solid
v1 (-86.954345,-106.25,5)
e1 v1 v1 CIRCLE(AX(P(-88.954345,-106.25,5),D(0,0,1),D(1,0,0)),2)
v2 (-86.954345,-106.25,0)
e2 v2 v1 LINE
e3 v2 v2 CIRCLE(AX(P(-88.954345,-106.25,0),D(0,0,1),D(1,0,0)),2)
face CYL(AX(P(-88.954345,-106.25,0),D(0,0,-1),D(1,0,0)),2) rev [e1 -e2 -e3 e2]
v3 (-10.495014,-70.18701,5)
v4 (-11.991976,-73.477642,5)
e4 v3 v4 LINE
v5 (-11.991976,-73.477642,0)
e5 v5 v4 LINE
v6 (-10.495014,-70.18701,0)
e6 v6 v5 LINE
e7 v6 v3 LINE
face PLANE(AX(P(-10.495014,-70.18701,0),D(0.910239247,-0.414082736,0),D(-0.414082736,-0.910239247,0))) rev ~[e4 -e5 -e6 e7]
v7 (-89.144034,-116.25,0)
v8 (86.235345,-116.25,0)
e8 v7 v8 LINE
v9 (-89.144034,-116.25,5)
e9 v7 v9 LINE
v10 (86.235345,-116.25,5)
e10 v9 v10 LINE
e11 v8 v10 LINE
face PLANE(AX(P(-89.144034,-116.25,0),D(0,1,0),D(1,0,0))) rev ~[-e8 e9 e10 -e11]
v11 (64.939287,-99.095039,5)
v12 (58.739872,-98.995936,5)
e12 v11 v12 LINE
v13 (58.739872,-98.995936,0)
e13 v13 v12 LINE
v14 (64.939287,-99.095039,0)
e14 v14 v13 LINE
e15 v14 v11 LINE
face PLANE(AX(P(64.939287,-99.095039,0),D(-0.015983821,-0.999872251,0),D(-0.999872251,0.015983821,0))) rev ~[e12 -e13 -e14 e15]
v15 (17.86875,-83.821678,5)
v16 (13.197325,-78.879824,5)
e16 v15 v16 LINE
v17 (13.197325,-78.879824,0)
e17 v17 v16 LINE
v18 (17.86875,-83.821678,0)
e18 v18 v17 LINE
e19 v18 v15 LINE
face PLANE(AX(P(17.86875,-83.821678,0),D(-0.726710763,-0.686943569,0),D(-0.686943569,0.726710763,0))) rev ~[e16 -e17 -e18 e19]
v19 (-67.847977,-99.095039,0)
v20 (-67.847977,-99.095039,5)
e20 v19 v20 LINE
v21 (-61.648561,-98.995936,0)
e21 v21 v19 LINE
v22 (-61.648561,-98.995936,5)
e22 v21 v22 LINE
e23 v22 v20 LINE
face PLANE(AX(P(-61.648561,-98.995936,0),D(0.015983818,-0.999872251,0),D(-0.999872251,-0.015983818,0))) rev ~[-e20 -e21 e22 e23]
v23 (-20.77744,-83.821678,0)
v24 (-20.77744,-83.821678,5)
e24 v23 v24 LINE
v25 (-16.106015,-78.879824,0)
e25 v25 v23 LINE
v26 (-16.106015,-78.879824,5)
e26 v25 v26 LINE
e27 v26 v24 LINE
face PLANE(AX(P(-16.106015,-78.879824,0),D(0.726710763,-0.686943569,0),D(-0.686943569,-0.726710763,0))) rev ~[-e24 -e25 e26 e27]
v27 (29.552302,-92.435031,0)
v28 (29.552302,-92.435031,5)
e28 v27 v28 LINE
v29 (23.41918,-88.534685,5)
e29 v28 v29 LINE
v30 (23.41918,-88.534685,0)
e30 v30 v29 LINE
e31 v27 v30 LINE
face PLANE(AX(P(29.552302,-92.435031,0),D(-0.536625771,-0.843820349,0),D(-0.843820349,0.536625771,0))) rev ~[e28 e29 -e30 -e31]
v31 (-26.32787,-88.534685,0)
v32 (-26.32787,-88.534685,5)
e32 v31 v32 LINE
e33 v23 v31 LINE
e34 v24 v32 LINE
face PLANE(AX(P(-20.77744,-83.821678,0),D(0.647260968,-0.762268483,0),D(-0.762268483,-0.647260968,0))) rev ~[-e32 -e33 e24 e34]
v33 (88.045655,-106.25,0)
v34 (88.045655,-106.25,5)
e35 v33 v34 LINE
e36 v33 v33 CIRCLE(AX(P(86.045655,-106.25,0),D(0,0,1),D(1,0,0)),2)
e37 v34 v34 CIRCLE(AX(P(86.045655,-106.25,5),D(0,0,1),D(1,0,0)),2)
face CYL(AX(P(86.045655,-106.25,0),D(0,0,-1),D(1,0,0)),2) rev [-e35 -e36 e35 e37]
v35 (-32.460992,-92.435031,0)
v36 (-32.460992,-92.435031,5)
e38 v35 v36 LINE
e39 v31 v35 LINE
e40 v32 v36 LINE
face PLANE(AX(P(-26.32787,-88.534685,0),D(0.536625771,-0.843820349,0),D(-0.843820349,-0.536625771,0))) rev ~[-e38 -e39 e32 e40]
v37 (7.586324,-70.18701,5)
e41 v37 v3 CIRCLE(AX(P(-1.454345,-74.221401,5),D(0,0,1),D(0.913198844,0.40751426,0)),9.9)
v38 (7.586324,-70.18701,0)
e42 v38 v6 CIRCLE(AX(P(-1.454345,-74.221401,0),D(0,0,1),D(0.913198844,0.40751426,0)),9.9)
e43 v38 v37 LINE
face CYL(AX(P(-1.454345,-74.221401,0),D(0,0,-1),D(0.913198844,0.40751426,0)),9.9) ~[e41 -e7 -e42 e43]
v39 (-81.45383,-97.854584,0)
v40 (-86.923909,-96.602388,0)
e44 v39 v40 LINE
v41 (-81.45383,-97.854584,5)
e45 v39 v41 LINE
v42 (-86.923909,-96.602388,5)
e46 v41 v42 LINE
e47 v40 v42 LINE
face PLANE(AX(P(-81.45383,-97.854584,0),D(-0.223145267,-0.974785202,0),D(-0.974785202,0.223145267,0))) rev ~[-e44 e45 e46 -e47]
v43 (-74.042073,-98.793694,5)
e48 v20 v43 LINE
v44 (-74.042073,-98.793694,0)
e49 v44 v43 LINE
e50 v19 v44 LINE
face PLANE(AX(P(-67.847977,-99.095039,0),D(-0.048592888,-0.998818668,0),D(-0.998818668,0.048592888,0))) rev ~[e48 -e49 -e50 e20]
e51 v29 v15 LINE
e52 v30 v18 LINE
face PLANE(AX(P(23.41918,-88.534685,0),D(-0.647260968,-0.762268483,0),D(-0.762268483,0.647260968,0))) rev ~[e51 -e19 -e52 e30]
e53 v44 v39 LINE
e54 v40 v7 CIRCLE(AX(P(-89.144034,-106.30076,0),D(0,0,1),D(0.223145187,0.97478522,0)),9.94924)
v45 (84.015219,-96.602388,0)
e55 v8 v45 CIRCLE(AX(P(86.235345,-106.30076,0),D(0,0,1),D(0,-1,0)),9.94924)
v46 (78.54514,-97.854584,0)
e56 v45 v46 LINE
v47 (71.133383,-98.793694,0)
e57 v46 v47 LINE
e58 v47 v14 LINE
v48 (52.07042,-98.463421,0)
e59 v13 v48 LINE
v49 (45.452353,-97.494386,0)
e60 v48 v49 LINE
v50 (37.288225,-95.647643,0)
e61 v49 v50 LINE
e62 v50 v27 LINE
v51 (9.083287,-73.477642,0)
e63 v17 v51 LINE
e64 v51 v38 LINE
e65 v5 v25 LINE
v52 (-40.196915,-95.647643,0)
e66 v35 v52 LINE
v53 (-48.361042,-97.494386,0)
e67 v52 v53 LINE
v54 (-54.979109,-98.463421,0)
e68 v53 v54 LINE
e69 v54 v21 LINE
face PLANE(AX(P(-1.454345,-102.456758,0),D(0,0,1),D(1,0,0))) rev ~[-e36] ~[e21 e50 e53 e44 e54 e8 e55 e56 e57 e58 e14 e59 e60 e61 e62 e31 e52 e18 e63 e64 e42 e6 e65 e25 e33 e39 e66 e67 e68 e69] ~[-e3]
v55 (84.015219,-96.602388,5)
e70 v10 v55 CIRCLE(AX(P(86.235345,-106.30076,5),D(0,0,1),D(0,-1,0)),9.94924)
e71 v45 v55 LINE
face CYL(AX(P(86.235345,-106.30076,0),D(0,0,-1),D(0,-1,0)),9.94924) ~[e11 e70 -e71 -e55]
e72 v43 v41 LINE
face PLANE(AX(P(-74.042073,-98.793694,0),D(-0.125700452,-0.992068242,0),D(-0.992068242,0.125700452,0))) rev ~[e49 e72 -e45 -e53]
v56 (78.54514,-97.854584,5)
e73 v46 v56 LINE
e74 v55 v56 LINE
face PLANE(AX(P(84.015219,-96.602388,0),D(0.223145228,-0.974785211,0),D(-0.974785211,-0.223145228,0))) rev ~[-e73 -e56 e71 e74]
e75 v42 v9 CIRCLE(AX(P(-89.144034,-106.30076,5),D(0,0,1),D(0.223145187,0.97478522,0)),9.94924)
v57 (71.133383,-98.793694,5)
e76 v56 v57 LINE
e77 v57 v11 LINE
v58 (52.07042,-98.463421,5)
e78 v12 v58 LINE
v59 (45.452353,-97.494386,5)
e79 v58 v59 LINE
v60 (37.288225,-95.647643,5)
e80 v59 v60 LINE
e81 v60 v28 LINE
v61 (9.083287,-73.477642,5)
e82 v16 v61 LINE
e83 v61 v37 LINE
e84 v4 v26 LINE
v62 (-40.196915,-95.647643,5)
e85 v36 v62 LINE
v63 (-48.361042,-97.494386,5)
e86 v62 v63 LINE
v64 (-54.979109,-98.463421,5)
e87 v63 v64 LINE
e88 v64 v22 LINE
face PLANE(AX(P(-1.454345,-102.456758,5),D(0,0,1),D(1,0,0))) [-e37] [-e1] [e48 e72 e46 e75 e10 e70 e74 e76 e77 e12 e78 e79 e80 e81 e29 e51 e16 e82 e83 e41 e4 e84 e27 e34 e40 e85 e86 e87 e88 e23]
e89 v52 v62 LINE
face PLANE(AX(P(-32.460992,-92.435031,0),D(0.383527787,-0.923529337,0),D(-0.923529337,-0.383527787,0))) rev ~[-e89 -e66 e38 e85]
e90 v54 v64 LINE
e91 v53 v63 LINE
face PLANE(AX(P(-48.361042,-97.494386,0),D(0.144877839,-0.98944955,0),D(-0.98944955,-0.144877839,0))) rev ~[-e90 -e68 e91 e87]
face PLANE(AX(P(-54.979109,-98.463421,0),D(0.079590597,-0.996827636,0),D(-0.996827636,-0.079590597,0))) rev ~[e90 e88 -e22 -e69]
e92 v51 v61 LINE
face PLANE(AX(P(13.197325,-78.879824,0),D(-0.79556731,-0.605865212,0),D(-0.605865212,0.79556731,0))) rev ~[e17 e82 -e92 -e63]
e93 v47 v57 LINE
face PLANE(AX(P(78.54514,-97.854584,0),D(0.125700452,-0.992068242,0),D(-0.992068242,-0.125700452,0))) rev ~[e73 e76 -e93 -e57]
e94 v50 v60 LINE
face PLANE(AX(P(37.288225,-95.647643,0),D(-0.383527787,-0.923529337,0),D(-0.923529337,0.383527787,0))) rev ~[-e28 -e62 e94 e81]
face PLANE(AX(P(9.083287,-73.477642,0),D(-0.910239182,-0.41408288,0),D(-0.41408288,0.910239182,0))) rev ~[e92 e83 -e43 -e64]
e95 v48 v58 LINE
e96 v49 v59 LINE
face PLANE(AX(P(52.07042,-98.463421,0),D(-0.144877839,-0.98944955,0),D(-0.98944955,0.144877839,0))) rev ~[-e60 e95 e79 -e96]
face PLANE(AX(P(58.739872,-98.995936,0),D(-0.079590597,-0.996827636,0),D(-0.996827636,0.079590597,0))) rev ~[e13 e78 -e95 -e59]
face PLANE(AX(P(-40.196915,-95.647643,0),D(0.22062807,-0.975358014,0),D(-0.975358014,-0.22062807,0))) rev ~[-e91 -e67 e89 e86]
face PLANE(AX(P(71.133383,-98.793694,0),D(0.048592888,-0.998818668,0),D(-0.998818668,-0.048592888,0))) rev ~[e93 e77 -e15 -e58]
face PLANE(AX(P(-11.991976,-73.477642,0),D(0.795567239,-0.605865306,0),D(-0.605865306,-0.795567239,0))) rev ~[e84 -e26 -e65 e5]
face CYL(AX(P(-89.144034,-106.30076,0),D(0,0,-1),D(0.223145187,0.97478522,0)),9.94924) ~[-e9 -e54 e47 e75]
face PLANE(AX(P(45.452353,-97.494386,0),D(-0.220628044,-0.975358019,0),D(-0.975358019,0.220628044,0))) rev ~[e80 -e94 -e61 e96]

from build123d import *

# Parameters (mm, degrees)
F0_R     = 2
F1_DEPTH = 5


# Not quite as in the source:
# - ends of sketch curves that miss each other by under 0.0002 mm in the source are joined


with BuildPart() as f1:
    # F0 (on Top) → F1 (new body)
    with BuildSketch(Plane.XY):
        with BuildLine():
            ThreePointArc((-86.9239089763, -96.6023878966), (-99.0303580955, -105.1836331247), (-89.144034, -116.25))
            Line((-89.144034, -116.25), (86.235345, -116.25))
            ThreePointArc((86.235345, -116.25), (96.1216690408, -105.1836326404), (84.0152190261, -96.6023881141))
            Line((84.0152190261, -96.6023881141), (78.54514, -97.854584))
            Line((78.54514, -97.854584), (71.133383, -98.793694))
            Line((71.133383, -98.793694), (64.939287, -99.095039))
            Line((64.939287, -99.095039), (58.739872, -98.995936))
            Line((58.739872, -98.995936), (52.07042, -98.463421))
            Line((52.07042, -98.463421), (45.452353, -97.494386))
            Line((45.452353, -97.494386), (37.288225, -95.647643))
            Line((37.288225, -95.647643), (29.552302, -92.435031))
            Line((29.552302, -92.435031), (23.41918, -88.534685))
            Line((23.41918, -88.534685), (17.86875, -83.821678))
            Line((17.86875, -83.821678), (13.197325, -78.879824))
            Line((13.197325, -78.879824), (9.083287, -73.477642))
            Line((9.083287, -73.477642), (7.586324, -70.18701))
            ThreePointArc((7.586324, -70.18701), (-1.454345, -64.321401), (-10.4950136906, -70.1870101381))
            Line((-10.4950136906, -70.1870101381), (-11.991976, -73.477642))
            Line((-11.991976, -73.477642), (-16.106015, -78.879824))
            Line((-16.106015, -78.879824), (-20.77744, -83.821678))
            Line((-20.77744, -83.821678), (-26.32787, -88.534685))
            Line((-26.32787, -88.534685), (-32.460992, -92.435031))
            Line((-32.460992, -92.435031), (-40.196915, -95.647643))
            Line((-40.196915, -95.647643), (-48.361042, -97.494386))
            Line((-48.361042, -97.494386), (-54.979109, -98.463421))
            Line((-54.979109, -98.463421), (-61.648561, -98.995936))
            Line((-61.648561, -98.995936), (-67.847977, -99.095039))
            Line((-67.847977, -99.095039), (-74.042073, -98.793694))
            Line((-74.042073, -98.793694), (-81.45383, -97.854584))
            Line((-81.45383, -97.854584), (-86.9239089763, -96.6023878966))
        make_face()
        with Locations((-88.954345, -106.25)):
            Circle(F0_R, mode=Mode.SUBTRACT)
        with Locations((86.045655, -106.25)):
            Circle(F0_R, mode=Mode.SUBTRACT)
    extrude(amount=F1_DEPTH)


solid = f1.part
